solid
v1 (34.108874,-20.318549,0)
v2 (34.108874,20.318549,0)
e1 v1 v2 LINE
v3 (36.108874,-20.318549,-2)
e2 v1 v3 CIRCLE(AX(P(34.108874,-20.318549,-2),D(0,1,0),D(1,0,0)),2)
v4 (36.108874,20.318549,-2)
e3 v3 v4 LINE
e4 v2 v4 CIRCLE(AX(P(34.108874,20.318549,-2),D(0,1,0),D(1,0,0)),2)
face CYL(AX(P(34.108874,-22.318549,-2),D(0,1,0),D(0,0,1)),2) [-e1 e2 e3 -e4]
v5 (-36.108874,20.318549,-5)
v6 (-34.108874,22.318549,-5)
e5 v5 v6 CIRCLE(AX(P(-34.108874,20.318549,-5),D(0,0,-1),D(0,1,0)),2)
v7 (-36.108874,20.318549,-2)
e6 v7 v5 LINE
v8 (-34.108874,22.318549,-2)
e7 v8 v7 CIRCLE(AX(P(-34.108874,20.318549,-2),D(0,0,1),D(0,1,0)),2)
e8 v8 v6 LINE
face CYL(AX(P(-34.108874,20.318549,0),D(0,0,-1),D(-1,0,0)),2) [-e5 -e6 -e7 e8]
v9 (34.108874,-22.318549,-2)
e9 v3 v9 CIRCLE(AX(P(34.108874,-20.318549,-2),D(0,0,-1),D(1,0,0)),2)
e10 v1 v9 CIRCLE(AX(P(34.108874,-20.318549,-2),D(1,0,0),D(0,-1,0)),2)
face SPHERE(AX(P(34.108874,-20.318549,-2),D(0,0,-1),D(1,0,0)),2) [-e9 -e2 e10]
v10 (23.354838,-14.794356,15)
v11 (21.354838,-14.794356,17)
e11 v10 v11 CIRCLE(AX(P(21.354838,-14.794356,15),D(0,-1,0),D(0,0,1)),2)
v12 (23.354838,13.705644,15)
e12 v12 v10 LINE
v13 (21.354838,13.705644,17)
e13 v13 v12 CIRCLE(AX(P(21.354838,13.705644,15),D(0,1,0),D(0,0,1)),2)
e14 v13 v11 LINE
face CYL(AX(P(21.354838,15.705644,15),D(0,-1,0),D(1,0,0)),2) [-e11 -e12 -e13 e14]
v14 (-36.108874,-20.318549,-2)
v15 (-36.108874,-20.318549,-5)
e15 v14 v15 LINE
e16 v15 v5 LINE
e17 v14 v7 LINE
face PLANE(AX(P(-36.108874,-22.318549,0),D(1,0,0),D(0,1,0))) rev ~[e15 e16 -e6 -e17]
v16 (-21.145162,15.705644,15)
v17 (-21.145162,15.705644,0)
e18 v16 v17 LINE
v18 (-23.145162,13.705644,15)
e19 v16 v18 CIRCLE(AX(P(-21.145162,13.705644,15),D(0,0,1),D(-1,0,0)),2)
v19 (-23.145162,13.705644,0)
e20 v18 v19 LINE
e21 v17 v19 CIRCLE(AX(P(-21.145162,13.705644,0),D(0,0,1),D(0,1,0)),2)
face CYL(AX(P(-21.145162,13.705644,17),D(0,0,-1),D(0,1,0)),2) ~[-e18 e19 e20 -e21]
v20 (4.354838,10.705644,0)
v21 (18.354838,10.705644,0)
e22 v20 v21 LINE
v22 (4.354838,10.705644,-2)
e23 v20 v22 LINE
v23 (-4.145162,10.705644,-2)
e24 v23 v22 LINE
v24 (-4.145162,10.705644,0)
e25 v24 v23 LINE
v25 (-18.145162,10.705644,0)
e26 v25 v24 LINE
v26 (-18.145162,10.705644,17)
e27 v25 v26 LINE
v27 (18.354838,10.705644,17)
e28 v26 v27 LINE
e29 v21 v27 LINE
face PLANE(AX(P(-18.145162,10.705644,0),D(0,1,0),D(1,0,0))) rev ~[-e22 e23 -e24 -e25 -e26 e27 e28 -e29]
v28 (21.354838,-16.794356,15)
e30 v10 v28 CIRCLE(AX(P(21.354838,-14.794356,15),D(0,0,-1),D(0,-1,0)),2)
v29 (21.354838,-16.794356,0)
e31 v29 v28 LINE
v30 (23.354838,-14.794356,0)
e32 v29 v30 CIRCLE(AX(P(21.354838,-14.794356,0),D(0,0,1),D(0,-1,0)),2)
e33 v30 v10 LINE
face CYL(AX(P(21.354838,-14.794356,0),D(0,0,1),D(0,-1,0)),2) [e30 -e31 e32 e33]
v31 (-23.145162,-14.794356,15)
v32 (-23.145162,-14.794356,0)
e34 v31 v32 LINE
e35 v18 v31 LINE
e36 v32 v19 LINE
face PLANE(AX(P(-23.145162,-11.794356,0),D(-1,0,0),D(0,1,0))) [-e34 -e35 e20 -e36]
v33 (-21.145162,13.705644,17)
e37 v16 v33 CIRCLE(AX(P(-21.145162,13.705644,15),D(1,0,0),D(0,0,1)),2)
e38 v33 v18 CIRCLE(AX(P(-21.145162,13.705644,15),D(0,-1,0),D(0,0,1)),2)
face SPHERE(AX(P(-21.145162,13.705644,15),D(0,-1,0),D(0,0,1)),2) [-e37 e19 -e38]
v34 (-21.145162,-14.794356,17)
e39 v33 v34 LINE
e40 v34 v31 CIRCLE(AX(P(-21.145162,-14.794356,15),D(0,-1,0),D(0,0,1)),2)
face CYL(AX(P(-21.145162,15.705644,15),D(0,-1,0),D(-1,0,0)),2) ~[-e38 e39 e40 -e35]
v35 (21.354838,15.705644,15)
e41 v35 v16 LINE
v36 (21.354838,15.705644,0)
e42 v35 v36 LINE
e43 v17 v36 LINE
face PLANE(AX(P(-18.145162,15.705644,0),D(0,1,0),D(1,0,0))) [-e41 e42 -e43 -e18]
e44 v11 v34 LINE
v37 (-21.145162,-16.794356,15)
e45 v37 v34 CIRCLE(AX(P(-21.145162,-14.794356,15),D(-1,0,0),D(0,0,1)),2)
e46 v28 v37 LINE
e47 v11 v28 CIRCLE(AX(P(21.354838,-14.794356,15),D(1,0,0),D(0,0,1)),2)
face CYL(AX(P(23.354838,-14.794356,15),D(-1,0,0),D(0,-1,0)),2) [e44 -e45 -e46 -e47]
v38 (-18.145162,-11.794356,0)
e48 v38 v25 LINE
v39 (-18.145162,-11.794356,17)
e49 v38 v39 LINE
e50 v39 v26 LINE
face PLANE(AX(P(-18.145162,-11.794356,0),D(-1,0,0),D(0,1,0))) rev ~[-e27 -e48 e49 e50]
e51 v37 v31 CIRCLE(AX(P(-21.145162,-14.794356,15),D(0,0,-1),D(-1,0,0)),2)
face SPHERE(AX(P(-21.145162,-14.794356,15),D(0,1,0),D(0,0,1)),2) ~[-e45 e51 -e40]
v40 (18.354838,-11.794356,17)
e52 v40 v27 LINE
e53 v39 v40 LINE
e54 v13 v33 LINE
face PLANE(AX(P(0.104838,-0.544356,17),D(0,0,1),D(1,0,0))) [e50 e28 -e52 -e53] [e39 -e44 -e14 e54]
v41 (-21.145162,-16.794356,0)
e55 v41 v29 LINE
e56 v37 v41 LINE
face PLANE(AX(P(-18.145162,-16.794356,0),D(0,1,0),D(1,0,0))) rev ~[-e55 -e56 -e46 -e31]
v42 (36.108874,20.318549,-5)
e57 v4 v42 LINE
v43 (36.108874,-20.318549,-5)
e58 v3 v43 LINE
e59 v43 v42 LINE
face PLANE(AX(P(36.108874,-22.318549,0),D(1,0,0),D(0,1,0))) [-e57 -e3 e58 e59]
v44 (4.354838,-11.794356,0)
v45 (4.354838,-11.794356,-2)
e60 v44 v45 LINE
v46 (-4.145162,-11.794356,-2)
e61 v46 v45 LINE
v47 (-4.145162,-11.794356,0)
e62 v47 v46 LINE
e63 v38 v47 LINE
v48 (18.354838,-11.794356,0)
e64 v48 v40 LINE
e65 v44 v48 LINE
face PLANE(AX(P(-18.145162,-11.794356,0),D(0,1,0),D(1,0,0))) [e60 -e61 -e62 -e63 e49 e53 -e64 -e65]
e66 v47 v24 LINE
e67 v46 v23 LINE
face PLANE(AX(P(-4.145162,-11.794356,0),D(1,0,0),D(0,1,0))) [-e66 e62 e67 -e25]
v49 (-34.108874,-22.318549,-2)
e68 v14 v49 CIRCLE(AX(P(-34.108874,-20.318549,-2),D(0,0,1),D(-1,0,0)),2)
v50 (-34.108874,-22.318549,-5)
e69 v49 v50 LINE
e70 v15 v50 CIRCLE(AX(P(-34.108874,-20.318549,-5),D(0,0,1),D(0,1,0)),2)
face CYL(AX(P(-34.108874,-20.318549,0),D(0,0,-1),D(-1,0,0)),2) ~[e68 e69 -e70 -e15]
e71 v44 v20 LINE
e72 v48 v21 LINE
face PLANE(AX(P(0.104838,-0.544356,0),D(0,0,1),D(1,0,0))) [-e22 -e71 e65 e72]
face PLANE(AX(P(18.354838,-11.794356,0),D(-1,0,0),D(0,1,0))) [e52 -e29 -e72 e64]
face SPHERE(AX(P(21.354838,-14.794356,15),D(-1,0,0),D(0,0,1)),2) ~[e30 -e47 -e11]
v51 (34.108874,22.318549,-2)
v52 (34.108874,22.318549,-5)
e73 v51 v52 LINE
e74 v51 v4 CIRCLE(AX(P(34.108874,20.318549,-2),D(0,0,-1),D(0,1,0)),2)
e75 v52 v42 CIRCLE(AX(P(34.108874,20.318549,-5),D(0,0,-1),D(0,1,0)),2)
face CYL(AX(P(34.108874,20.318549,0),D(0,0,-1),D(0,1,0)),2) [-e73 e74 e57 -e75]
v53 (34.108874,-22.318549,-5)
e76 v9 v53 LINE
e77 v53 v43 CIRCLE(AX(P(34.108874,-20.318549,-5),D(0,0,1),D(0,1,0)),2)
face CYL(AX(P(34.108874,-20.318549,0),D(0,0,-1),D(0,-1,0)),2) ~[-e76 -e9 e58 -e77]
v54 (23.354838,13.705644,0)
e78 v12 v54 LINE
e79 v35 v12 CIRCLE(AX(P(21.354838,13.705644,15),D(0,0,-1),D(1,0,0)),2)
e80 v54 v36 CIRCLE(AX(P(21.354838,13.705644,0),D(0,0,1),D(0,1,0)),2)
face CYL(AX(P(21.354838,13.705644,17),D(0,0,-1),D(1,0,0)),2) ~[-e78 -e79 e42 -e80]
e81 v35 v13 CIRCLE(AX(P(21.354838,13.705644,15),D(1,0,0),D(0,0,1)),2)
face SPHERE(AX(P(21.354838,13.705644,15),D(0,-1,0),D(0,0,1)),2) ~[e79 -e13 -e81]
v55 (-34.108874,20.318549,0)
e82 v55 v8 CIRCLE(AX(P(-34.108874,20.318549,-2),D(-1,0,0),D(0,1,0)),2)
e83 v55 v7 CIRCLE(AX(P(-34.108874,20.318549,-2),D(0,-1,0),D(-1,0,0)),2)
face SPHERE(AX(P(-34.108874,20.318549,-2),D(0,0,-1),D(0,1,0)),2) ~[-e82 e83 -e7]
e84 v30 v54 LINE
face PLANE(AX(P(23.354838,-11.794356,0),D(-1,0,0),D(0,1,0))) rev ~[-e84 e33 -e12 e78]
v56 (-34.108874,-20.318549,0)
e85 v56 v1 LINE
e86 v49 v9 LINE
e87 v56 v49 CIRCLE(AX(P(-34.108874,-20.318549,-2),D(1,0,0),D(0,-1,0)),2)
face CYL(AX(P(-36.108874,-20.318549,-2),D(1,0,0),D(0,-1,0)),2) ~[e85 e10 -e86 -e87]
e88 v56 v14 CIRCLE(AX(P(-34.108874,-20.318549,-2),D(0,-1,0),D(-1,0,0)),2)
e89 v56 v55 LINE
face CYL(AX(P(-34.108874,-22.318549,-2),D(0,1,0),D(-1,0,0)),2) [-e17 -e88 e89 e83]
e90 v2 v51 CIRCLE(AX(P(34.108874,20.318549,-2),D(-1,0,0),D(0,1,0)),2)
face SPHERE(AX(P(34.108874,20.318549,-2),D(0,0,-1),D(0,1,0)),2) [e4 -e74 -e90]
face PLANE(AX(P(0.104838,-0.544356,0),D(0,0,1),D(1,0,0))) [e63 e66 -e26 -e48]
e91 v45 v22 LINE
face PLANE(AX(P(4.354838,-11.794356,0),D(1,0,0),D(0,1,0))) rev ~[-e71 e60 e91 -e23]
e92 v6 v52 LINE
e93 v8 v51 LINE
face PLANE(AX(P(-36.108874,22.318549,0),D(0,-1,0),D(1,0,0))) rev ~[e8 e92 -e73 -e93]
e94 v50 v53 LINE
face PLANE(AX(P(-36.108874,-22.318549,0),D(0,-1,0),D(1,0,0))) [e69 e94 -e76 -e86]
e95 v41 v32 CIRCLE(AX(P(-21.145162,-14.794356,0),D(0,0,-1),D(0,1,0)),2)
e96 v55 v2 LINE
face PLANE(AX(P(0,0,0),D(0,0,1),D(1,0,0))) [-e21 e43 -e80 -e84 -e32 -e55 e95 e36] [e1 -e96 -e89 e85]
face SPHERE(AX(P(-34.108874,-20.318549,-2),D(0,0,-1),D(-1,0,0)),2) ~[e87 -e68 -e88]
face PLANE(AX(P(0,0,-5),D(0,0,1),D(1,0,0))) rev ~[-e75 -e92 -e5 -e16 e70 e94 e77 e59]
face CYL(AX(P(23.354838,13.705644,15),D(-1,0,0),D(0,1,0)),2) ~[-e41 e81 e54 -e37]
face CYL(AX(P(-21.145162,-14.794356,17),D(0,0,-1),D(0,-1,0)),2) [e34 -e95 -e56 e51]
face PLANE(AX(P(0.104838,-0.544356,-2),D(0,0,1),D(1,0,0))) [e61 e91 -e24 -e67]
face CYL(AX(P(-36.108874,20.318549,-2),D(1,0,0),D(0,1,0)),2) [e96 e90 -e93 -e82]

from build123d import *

# Parameters (mm, degrees)
F0_W     = 36.5
F0_H     = 22.5
F1_DEPTH = 17
F2_T     = 5
F3_W     = 8.5
F3_H     = 22.5
F4_DEPTH = 2
F0_W_2   = 72.2177475691
F0_H_2   = 44.6370989084
F5_DEPTH = 5
F6_R     = 2


# Not quite as in the source:
# - two fillets or chamfers of one size are made in one step


with BuildPart() as f1:
    # F0 (on Top) → F1 (new body)
    with BuildSketch(Plane.XY):
        with Locations((0.1048383191, -0.5443561636)):
            Rectangle(F0_W, F0_H)
    extrude(amount=F1_DEPTH)

    # F2
    f2_openings = [f1.faces().sort_by_distance(p)[0] for p in [
        (0.104838, -0.544356, 17),
    ]]
    offset(amount=F2_T, openings=f2_openings, kind=Kind.INTERSECTION)

    # F3 (on face) → F4 (cut)
    with BuildSketch(Plane.XY):
        with Locations((0.1048383191, -0.5443561636)):
            Rectangle(F3_W, F3_H)
    extrude(amount=-F4_DEPTH, mode=Mode.SUBTRACT)

    # F0 (on Top) → F5 (join)
    with BuildSketch(Plane.XY):
        Rectangle(F0_W_2, F0_H_2)
        with Locations((0.1048383191, -0.5443561636)):
            Rectangle(F0_W, F0_H, mode=Mode.SUBTRACT)
    extrude(amount=-F5_DEPTH)

    # F6
    f6_edges = [f1.edges().sort_by_distance(p)[0] for p in [
        (36.108874, -22.318549, -2.5),
        (36.108874, 22.318549, -2.5),
        (-36.108874, -22.318549, -2.5),
        (-36.108874, 22.318549, -2.5),
        (-23.145162, -0.544356, 17),
        (0.104838, -16.794356, 17),
        (23.354838, -0.544356, 17),
        (0.104838, 15.705644, 17),
        (-23.145162, -16.794356, 8.5),
        (-23.145162, 15.705644, 8.5),
        (23.354838, -16.794356, 8.5),
        (23.354838, 15.705644, 8.5),
        (0, 22.318549, 0),
        (36.108874, 0, 0),
        (-36.108874, 0, 0),
        (0, -22.318549, 0),
    ]]
    fillet(f6_edges, radius=F6_R)


solid = f1.part
